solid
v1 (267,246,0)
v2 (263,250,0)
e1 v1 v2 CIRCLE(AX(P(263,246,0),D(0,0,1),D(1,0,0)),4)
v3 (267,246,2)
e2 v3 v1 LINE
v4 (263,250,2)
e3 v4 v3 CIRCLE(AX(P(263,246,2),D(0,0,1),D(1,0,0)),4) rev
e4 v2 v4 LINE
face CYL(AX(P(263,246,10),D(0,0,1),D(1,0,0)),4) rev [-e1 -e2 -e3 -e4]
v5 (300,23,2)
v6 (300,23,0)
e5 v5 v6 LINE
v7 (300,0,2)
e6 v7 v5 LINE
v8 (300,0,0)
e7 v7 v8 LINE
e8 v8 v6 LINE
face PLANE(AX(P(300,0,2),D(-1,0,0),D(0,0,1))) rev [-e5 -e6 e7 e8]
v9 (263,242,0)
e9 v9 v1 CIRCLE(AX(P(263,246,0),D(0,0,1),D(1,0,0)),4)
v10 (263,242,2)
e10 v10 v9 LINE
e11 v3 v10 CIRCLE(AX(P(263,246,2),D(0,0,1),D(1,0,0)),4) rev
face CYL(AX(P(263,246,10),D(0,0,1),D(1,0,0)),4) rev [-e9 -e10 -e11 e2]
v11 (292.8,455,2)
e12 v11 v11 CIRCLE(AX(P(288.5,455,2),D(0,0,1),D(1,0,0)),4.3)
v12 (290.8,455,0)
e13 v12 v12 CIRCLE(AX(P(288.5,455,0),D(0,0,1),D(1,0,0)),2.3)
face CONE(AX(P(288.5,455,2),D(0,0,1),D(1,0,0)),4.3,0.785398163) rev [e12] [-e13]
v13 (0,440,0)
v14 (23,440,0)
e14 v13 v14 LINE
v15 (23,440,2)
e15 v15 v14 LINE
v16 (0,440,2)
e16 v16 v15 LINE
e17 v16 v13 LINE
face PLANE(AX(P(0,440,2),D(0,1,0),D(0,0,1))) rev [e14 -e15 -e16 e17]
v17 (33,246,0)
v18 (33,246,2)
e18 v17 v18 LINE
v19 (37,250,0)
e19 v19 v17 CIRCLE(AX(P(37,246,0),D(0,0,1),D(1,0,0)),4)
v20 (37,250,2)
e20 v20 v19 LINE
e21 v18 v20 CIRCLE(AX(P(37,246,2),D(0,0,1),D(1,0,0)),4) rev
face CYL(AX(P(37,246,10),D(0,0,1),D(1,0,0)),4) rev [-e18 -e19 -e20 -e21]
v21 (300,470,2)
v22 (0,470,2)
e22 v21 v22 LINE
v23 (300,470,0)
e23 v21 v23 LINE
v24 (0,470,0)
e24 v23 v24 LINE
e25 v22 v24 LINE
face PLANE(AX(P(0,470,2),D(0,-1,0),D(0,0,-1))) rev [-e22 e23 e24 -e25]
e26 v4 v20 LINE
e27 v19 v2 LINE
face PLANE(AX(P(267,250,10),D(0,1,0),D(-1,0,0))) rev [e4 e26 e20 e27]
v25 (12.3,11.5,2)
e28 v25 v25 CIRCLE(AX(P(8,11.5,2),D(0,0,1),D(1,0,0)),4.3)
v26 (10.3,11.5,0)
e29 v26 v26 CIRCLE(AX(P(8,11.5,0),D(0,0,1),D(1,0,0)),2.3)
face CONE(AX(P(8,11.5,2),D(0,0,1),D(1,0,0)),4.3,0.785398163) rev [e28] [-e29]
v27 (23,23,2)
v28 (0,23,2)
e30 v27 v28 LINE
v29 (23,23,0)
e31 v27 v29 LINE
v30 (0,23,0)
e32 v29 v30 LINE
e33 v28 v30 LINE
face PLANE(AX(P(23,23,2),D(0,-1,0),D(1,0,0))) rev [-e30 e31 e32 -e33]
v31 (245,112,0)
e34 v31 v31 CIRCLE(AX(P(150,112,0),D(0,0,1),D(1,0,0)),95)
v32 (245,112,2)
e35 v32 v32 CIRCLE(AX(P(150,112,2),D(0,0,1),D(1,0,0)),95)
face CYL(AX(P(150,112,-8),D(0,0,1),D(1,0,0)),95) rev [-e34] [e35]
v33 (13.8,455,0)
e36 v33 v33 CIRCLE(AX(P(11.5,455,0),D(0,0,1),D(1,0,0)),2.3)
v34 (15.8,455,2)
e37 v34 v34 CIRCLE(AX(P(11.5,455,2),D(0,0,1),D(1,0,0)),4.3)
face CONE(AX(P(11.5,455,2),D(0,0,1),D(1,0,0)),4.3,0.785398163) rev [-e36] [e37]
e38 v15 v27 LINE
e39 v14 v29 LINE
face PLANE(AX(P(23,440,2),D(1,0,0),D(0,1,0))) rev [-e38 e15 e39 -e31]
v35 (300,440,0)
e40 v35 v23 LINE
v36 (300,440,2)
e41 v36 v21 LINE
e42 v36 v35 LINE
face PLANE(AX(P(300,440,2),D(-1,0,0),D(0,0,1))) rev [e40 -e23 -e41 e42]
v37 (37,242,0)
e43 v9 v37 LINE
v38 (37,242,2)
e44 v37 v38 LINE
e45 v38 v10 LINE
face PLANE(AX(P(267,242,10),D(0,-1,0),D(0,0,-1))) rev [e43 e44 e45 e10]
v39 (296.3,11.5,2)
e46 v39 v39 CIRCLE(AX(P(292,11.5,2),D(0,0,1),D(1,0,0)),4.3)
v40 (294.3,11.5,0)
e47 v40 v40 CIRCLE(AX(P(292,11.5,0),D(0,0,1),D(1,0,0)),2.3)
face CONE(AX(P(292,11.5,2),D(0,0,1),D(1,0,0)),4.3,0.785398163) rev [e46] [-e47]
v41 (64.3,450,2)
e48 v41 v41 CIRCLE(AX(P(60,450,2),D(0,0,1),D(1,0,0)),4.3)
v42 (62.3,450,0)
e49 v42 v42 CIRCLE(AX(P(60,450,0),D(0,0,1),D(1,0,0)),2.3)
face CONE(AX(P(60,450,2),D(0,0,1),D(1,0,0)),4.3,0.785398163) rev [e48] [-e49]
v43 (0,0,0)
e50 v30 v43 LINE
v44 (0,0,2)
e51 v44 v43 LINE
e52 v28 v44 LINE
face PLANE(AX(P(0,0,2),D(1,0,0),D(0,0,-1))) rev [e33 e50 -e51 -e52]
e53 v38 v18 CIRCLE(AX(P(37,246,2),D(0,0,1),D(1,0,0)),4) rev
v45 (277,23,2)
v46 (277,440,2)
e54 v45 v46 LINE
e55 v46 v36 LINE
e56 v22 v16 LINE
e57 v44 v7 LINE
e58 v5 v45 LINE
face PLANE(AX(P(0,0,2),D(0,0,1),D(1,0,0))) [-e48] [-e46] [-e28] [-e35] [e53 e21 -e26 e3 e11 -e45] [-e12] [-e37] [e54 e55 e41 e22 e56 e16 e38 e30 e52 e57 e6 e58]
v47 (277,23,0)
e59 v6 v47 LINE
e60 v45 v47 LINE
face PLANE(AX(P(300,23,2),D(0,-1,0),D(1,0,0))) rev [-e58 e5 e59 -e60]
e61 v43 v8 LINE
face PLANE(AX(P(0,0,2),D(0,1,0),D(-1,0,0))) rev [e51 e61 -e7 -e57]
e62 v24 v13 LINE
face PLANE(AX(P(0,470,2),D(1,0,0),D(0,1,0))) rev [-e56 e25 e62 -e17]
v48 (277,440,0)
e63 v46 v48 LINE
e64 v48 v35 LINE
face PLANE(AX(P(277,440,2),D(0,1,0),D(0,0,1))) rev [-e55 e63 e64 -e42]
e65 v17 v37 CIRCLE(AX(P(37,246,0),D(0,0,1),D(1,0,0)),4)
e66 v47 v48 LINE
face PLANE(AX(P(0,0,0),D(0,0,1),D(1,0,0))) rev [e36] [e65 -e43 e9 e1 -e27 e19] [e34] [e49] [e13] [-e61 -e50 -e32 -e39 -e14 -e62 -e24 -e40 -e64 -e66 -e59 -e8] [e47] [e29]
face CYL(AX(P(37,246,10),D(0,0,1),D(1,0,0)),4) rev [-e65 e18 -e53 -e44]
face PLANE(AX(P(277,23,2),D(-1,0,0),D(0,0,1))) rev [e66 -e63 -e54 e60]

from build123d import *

# Parameters (mm, degrees)
AUFSATZ_LINEAR_AUSTRAGEN1_DEPTH                      = 2
FORMSENKUNG_F_R_M4_SENKSCHRAUBE_MIT_INNE_D           = 4.5
FORMSENKUNG_F_R_M4_SENKSCHRAUBE_MIT_INNE_DEPTH       = 15
FORMSENKUNG_F_R_M4_SENKSCHRAUBE_MIT_INNE_CSINK_D     = 8.6
FORMSENKUNG_F_R_M4_SENKSCHRAUBE_MIT_INNE_CSINK_ANGLE = 90
FORMSENKUNG_F_R_M4_SENKSCHRAUBE_MIT_INNE_TIP         = 1.351936393
SKIZZE4_R                                            = 95
SCHNITT_LINEAR_AUSTRAGEN1_DEPTH                      = 10
ERDUNG_AT_2_COUNT                                    = 2
ERDUNG_AT_2_PITCH                                    = 204.963132201
SKIZZE7_W                                            = 234
SKIZZE7_H                                            = 8
SCHNITT_LINEAR_AUSTRAGEN2_DEPTH                      = 10
VERRUNDUNG1_R                                        = 4


with BuildPart() as part:
    # Skizze1 → Aufsatz-Linear austragen1 (new body)
    with BuildSketch(Plane.XY):
        Polygon((0, 0), (300, 0), (300, 23), (277, 23), (277, 440), (300, 440), (300, 470), (0, 470), (0, 440), (23, 440), (23, 23), (0, 23), align=None)
    extrude(amount=AUFSATZ_LINEAR_AUSTRAGEN1_DEPTH)

    # Formsenkung für M4 Senkschraube mit Innensechskant1
    with Locations(Plane.XY.offset(2)):
        with Locations((292, 11.5), (8, 11.5), (11.5, 455), (288.5, 455)):
            CounterSinkHole(FORMSENKUNG_F_R_M4_SENKSCHRAUBE_MIT_INNE_D / 2, FORMSENKUNG_F_R_M4_SENKSCHRAUBE_MIT_INNE_CSINK_D / 2, depth=FORMSENKUNG_F_R_M4_SENKSCHRAUBE_MIT_INNE_DEPTH, counter_sink_angle=FORMSENKUNG_F_R_M4_SENKSCHRAUBE_MIT_INNE_CSINK_ANGLE)
            with Locations((0, 0, -(FORMSENKUNG_F_R_M4_SENKSCHRAUBE_MIT_INNE_DEPTH + FORMSENKUNG_F_R_M4_SENKSCHRAUBE_MIT_INNE_TIP / 2))):  # 118° drill point
                Cone(0, FORMSENKUNG_F_R_M4_SENKSCHRAUBE_MIT_INNE_D / 2, FORMSENKUNG_F_R_M4_SENKSCHRAUBE_MIT_INNE_TIP, mode=Mode.SUBTRACT)

    # Skizze4 → Schnitt-Linear austragen1 (cut)
    with BuildSketch(Plane.XY.offset(2)):
        with Locations((150, 112)):
            Circle(SKIZZE4_R)
    extrude(amount=-SCHNITT_LINEAR_AUSTRAGEN1_DEPTH, mode=Mode.SUBTRACT)

    # Skizze6 → Erdung (revolve, cut)
    with BuildSketch(Plane(origin=(60, 450, 2), x_dir=(0, -1, 0), z_dir=(1, 0, 0))):
        Polygon((0, 0), (0, 2), (2.25, 2), (2.25, 2.05), (4.3, 0), align=None)
    erdung = revolve(axis=Axis((60, 450, 8.35), (0, 0, -1)), mode=Mode.SUBTRACT)

    # Erdung at 2: Erdung ×2
    with Locations(*[Vector(-0.17833221510322264, 0.9839703354554842, 0) * (i * ERDUNG_AT_2_PITCH) for i in range(1, ERDUNG_AT_2_COUNT)]):
        add(erdung, mode=Mode.SUBTRACT)

    # Skizze7 → Schnitt-Linear austragen2 (cut)
    with BuildSketch(Plane(origin=(0, 0, 0), x_dir=(-1, 0, 0), z_dir=(0, 0, -1))):
        with Locations((-150, 246)):
            Rectangle(SKIZZE7_W, SKIZZE7_H)
    extrude(amount=-SCHNITT_LINEAR_AUSTRAGEN2_DEPTH, mode=Mode.SUBTRACT)

    # Verrundung1
    verrundung1_edges = [part.edges().sort_by_distance(p)[0] for p in [
        (33, 242, 1),
        (33, 250, 1),
        (267, 242, 1),
        (267, 250, 1),
    ]]
    fillet(verrundung1_edges, radius=VERRUNDUNG1_R - 0.0001)  # a hair under: the kernel refuses the full size


solid = part.part
